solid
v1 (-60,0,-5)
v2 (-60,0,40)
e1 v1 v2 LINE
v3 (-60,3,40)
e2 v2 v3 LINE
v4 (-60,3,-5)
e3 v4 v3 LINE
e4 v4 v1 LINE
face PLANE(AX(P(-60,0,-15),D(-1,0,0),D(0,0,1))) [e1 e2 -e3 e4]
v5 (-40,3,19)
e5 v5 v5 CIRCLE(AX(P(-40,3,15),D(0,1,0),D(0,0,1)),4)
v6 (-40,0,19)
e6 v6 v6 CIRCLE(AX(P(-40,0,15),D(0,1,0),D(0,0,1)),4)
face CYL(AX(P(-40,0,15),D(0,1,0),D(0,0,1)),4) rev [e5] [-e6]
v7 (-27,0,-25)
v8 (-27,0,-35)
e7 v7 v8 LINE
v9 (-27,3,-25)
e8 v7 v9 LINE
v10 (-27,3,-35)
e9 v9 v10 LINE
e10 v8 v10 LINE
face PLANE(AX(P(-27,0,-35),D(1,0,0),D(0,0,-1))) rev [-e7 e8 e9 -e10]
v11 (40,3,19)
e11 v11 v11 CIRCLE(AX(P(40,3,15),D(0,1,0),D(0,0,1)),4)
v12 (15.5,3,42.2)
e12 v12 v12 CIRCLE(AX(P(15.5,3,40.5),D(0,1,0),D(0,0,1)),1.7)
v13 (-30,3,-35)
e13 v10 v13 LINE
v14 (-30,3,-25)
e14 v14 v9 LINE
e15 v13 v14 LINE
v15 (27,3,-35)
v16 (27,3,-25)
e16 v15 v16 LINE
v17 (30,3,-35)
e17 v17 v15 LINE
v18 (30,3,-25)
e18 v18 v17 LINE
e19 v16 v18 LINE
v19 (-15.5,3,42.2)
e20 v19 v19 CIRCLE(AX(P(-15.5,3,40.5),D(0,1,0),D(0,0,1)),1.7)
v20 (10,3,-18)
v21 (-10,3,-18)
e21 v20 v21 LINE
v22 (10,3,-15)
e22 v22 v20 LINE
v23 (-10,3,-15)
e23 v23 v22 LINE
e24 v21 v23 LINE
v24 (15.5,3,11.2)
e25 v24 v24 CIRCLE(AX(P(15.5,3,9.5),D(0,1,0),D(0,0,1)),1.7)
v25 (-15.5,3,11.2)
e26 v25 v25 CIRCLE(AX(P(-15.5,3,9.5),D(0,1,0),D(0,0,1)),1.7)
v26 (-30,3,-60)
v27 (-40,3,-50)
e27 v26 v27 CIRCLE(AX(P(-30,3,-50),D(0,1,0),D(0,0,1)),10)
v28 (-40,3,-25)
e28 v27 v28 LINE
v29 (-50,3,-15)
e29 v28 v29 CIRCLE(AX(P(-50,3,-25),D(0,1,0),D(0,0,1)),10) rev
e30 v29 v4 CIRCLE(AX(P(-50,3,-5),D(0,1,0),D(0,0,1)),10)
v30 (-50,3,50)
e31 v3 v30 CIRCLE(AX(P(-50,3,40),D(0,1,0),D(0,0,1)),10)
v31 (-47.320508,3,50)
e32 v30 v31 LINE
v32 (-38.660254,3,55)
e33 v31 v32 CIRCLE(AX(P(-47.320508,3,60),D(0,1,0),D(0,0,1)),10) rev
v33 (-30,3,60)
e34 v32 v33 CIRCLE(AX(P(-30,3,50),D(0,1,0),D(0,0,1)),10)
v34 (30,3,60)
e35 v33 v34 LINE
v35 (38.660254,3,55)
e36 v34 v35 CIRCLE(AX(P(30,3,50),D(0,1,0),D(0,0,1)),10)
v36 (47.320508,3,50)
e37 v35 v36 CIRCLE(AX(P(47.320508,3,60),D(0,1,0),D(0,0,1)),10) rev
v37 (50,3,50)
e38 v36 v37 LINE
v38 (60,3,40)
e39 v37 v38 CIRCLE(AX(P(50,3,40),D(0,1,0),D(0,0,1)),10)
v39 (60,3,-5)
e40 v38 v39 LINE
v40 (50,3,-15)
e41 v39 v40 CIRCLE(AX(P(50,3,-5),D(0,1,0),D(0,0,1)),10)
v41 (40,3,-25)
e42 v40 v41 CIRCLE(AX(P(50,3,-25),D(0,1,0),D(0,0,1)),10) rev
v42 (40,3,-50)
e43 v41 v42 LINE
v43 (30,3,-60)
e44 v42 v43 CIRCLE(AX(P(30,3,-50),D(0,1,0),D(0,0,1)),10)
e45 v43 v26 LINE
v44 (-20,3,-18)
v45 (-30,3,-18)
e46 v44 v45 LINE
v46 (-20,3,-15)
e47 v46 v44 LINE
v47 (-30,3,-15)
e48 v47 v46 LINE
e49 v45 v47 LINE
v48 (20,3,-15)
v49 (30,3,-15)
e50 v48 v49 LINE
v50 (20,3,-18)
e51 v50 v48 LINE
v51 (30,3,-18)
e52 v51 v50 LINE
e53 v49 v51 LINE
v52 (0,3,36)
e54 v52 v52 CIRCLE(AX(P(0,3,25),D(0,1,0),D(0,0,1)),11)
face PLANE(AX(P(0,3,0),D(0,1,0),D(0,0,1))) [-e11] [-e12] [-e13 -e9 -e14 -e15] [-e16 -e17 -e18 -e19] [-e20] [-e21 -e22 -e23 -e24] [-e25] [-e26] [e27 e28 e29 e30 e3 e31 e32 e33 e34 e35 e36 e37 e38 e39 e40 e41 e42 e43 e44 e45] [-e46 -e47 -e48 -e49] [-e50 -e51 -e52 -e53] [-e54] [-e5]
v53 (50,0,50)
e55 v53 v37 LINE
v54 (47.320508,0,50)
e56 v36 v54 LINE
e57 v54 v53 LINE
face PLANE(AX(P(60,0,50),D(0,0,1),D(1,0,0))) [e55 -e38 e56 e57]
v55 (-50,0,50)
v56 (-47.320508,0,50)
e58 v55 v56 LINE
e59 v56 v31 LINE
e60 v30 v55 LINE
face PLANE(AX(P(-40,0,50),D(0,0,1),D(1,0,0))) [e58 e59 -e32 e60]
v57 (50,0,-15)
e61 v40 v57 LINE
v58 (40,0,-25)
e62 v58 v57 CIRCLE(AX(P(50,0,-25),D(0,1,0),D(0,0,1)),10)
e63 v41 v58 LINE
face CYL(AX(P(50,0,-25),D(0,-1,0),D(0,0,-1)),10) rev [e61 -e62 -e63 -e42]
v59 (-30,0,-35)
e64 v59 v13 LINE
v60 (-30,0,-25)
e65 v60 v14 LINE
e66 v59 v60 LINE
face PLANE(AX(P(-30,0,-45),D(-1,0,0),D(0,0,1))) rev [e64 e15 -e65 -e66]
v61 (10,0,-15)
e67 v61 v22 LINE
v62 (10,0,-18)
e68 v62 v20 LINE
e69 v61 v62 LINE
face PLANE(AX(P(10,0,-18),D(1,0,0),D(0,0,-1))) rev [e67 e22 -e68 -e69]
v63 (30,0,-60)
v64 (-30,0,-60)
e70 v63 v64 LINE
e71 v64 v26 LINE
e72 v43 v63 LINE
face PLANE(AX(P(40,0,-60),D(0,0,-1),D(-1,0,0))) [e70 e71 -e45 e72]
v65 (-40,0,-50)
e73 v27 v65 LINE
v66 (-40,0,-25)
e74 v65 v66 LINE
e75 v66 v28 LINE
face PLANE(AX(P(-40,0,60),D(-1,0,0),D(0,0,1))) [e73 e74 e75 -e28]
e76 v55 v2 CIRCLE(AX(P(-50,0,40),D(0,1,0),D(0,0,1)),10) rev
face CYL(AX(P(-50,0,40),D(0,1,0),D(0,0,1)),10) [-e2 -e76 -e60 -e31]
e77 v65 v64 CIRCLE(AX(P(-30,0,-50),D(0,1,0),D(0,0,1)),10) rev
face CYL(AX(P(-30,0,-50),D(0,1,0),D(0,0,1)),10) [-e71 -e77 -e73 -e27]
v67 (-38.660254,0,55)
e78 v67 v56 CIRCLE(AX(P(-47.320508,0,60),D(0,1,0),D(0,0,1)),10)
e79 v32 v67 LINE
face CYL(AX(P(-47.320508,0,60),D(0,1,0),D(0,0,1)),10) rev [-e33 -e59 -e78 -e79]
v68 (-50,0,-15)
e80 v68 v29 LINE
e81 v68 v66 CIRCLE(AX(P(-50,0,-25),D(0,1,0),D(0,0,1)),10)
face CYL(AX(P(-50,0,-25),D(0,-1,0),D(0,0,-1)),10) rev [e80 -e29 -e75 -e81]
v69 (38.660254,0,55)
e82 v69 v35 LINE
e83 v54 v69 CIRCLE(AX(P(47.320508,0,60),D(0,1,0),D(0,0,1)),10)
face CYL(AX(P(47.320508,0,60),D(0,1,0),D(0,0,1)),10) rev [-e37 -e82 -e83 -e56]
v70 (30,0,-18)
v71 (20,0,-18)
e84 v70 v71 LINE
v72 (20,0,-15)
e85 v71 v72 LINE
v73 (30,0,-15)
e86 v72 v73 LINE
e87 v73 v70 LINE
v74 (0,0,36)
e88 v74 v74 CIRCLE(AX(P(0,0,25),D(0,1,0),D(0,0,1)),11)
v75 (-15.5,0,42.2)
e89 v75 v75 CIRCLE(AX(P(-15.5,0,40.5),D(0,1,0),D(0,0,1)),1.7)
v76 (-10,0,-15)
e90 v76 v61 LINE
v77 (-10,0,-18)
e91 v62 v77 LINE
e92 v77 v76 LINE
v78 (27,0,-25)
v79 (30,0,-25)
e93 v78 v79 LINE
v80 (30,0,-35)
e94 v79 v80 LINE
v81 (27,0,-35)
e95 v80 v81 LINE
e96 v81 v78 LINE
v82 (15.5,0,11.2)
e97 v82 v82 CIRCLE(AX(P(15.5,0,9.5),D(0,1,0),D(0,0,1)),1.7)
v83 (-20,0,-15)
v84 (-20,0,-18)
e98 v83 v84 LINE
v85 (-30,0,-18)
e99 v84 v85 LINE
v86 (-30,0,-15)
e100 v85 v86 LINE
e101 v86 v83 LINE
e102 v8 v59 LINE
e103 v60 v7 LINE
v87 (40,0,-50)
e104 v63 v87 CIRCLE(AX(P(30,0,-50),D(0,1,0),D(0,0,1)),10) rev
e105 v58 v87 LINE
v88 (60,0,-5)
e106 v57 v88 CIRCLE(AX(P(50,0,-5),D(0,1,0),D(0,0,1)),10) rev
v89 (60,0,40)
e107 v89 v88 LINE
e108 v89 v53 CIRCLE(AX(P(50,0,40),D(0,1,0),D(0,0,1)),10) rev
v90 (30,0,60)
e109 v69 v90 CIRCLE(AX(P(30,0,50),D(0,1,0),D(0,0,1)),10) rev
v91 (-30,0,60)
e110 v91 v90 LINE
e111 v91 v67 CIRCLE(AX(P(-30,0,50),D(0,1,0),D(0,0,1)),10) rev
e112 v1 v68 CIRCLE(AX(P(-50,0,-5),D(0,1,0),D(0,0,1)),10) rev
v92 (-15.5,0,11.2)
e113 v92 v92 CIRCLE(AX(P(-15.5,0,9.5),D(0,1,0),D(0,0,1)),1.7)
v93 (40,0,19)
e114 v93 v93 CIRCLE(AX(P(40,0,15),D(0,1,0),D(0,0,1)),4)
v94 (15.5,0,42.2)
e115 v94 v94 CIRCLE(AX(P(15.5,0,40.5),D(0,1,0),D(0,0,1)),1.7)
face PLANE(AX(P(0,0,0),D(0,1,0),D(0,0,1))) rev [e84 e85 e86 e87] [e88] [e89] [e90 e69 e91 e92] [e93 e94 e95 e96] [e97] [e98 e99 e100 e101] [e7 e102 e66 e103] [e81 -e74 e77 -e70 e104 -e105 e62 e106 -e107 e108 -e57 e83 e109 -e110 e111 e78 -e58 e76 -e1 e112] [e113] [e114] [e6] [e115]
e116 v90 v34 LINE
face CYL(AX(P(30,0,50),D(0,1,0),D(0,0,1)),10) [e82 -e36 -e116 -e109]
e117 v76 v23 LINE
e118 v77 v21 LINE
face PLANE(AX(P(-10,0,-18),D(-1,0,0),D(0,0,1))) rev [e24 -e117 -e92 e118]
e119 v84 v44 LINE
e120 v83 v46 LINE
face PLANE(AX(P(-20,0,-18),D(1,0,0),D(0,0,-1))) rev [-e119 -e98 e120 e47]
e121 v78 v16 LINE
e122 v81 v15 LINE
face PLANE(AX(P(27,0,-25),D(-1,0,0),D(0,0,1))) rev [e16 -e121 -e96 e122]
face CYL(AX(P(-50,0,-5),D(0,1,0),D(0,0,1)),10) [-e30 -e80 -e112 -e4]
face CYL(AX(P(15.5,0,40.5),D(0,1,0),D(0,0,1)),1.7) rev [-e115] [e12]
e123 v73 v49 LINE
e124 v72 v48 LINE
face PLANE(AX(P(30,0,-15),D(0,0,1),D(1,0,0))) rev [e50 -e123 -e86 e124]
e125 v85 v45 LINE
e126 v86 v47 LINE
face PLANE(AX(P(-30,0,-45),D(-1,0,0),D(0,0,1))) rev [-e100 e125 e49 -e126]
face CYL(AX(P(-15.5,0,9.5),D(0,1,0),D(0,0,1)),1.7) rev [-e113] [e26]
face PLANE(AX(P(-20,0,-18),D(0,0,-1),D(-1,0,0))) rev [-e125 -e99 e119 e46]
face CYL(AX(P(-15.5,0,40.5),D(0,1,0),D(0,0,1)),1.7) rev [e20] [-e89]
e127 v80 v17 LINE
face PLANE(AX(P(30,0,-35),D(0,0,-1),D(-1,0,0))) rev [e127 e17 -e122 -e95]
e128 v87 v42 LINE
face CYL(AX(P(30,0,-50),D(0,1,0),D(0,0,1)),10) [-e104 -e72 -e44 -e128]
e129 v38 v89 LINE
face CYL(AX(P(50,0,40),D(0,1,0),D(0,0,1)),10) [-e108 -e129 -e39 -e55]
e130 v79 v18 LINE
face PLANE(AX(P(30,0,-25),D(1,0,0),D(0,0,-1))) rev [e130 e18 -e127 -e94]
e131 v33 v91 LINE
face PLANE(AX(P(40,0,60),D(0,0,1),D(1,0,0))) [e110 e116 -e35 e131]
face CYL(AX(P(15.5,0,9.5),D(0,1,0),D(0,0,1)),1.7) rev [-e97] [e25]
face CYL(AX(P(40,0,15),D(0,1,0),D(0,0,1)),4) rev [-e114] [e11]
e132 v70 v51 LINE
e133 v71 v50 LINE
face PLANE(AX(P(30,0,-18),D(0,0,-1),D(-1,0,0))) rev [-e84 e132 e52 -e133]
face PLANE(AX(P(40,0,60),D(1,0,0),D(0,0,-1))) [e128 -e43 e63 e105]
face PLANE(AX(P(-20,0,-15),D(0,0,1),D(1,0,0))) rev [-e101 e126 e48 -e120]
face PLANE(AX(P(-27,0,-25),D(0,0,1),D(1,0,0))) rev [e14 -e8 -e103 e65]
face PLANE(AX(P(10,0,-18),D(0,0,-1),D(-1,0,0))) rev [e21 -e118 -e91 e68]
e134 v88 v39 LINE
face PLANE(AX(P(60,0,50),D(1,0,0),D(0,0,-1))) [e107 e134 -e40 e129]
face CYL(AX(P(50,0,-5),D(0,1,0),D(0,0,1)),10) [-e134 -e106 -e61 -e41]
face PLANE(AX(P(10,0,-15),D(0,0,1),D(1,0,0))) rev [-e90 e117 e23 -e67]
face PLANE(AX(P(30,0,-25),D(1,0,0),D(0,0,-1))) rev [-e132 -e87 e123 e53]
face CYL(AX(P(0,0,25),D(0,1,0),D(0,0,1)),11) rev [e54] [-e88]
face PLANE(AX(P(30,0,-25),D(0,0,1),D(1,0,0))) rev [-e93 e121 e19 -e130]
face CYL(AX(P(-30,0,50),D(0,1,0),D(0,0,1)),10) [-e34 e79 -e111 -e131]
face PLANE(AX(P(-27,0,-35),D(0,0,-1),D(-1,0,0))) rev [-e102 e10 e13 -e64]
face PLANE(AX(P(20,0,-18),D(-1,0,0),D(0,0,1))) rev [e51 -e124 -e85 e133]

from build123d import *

# Parameters (mm, degrees)
SKETCH1_W           = 60
SKETCH1_H           = 90
BOSS_EXTRUDE1_DEPTH = 3
SKETCH2_W           = 10
SKETCH2_H           = 3
SKETCH2_W_2         = 3
SKETCH2_H_2         = 10
SKETCH2_W_3         = 20
CUT_EXTRUDE2_DEPTH  = 3
SKETCH3_W           = 80
SKETCH3_H           = 120
BOSS_EXTRUDE2_DEPTH = 3
FILLET1_R           = 10
FILLET2_R           = 10
SKETCH4_R           = 1.7
CUT_EXTRUDE3_DEPTH  = 3
SKETCH5_R           = 11
CUT_EXTRUDE4_DEPTH  = 3
SKETCH6_W           = 20
SKETCH6_H           = 65
BOSS_EXTRUDE3_DEPTH = 3
FILLET3_R           = 10
SKETCH7_R           = 4
CUT_EXTRUDE5_DEPTH  = 3


with BuildPart() as part:
    # Sketch1 → Boss-Extrude1 (new body)
    with BuildSketch(Plane(origin=(0, 0, 0), x_dir=(1, 0, 0), z_dir=(0, 1, 0))):
        Rectangle(SKETCH1_W, SKETCH1_H)
    extrude(amount=BOSS_EXTRUDE1_DEPTH)

    # Sketch2 → Cut-Extrude2 (cut)
    with BuildSketch(Plane(origin=(0, 3, 0), x_dir=(1, 0, 0), z_dir=(0, 1, 0))):
        with Locations((25, 16.5)):
            Rectangle(SKETCH2_W, SKETCH2_H)
        with Locations((-28.5, 30)):
            Rectangle(SKETCH2_W_2, SKETCH2_H_2)
        with Locations((-25, 16.5)):
            Rectangle(SKETCH2_W, SKETCH2_H)
        with Locations((0, 16.5)):
            Rectangle(SKETCH2_W_3, SKETCH2_H)
        with Locations((28.5, 30)):
            Rectangle(SKETCH2_W_2, SKETCH2_H_2)
    extrude(amount=-CUT_EXTRUDE2_DEPTH, mode=Mode.SUBTRACT)

    # Sketch3 → Boss-Extrude2 (add)
    with BuildSketch(Plane(origin=(0, 3, 0), x_dir=(1, 0, 0), z_dir=(0, 1, 0))):
        Rectangle(SKETCH3_W, SKETCH3_H)
        Polygon((-30, 18), (-30, -45), (30, -45), (30, 18), (30, 25), (30, 45), (-30, 45), (-30, 35), align=None, mode=Mode.SUBTRACT)
    extrude(amount=-BOSS_EXTRUDE2_DEPTH)

    # Fillet1
    fillet1_edges = [part.edges().sort_by_distance(p)[0] for p in [
        (-40, 1.5, 60),
        (40, 1.5, 60),
    ]]
    fillet(fillet1_edges, radius=FILLET1_R)

    # Fillet2
    fillet2_edges = [part.edges().sort_by_distance(p)[0] for p in [
        (-40, 1.5, -60),
        (40, 1.5, -60),
    ]]
    fillet(fillet2_edges, radius=FILLET2_R)

    # Sketch4 → Cut-Extrude3 (cut)
    with BuildSketch(Plane(origin=(0, 3, 0), x_dir=(1, 0, 0), z_dir=(0, 1, 0))):
        with Locations(Location((15.5, -9.5, 0), (0, 0, 270))):
            Circle(SKETCH4_R)
        with Locations(Location((15.5, -40.5, 0), (0, 0, 270))):
            Circle(SKETCH4_R)
        with Locations(Location((-15.5, -40.5, 0), (0, 0, 270))):
            Circle(SKETCH4_R)
        with Locations(Location((-15.5, -9.5, 0), (0, 0, 270))):
            Circle(SKETCH4_R)
    extrude(amount=-CUT_EXTRUDE3_DEPTH, mode=Mode.SUBTRACT)

    # Sketch5 → Cut-Extrude4 (cut)
    with BuildSketch(Plane(origin=(0, 3, 0), x_dir=(1, 0, 0), z_dir=(0, 1, 0))):
        with Locations(Location((0, -25, 0), (0, 0, 270))):
            Circle(SKETCH5_R)
    extrude(amount=-CUT_EXTRUDE4_DEPTH, mode=Mode.SUBTRACT)

    # Sketch6 → Boss-Extrude3 (add)
    with BuildSketch(Plane(origin=(0, 3, 0), x_dir=(1, 0, 0), z_dir=(0, 1, 0))):
        with Locations((50, -17.5)):
            Rectangle(SKETCH6_W, SKETCH6_H)
        with Locations((-50, -17.5)):
            Rectangle(SKETCH6_W, SKETCH6_H)
    extrude(amount=-BOSS_EXTRUDE3_DEPTH)

    # Fillet3
    fillet3_edges = [part.edges().sort_by_distance(p)[0] for p in [
        (-40, 1.5, 50),
        (-60, 1.5, 50),
        (-40, 1.5, -15),
        (-60, 1.5, -15),
        (40, 1.5, -15),
        (60, 1.5, -15),
        (60, 1.5, 50),
        (40, 1.5, 50),
    ]]
    fillet(fillet3_edges, radius=FILLET3_R - 0.0001)  # a hair under: the kernel refuses the full size

    # Sketch7 → Cut-Extrude5 (cut)
    with BuildSketch(Plane(origin=(0, 3, 0), x_dir=(1, 0, 0), z_dir=(0, 1, 0))):
        with Locations(Location((-40, -15, 0), (0, 0, 270))):
            Circle(SKETCH7_R)
        with Locations(Location((40, -15, 0), (0, 0, 270))):
            Circle(SKETCH7_R)
    extrude(amount=-CUT_EXTRUDE5_DEPTH, mode=Mode.SUBTRACT)


solid = part.part
